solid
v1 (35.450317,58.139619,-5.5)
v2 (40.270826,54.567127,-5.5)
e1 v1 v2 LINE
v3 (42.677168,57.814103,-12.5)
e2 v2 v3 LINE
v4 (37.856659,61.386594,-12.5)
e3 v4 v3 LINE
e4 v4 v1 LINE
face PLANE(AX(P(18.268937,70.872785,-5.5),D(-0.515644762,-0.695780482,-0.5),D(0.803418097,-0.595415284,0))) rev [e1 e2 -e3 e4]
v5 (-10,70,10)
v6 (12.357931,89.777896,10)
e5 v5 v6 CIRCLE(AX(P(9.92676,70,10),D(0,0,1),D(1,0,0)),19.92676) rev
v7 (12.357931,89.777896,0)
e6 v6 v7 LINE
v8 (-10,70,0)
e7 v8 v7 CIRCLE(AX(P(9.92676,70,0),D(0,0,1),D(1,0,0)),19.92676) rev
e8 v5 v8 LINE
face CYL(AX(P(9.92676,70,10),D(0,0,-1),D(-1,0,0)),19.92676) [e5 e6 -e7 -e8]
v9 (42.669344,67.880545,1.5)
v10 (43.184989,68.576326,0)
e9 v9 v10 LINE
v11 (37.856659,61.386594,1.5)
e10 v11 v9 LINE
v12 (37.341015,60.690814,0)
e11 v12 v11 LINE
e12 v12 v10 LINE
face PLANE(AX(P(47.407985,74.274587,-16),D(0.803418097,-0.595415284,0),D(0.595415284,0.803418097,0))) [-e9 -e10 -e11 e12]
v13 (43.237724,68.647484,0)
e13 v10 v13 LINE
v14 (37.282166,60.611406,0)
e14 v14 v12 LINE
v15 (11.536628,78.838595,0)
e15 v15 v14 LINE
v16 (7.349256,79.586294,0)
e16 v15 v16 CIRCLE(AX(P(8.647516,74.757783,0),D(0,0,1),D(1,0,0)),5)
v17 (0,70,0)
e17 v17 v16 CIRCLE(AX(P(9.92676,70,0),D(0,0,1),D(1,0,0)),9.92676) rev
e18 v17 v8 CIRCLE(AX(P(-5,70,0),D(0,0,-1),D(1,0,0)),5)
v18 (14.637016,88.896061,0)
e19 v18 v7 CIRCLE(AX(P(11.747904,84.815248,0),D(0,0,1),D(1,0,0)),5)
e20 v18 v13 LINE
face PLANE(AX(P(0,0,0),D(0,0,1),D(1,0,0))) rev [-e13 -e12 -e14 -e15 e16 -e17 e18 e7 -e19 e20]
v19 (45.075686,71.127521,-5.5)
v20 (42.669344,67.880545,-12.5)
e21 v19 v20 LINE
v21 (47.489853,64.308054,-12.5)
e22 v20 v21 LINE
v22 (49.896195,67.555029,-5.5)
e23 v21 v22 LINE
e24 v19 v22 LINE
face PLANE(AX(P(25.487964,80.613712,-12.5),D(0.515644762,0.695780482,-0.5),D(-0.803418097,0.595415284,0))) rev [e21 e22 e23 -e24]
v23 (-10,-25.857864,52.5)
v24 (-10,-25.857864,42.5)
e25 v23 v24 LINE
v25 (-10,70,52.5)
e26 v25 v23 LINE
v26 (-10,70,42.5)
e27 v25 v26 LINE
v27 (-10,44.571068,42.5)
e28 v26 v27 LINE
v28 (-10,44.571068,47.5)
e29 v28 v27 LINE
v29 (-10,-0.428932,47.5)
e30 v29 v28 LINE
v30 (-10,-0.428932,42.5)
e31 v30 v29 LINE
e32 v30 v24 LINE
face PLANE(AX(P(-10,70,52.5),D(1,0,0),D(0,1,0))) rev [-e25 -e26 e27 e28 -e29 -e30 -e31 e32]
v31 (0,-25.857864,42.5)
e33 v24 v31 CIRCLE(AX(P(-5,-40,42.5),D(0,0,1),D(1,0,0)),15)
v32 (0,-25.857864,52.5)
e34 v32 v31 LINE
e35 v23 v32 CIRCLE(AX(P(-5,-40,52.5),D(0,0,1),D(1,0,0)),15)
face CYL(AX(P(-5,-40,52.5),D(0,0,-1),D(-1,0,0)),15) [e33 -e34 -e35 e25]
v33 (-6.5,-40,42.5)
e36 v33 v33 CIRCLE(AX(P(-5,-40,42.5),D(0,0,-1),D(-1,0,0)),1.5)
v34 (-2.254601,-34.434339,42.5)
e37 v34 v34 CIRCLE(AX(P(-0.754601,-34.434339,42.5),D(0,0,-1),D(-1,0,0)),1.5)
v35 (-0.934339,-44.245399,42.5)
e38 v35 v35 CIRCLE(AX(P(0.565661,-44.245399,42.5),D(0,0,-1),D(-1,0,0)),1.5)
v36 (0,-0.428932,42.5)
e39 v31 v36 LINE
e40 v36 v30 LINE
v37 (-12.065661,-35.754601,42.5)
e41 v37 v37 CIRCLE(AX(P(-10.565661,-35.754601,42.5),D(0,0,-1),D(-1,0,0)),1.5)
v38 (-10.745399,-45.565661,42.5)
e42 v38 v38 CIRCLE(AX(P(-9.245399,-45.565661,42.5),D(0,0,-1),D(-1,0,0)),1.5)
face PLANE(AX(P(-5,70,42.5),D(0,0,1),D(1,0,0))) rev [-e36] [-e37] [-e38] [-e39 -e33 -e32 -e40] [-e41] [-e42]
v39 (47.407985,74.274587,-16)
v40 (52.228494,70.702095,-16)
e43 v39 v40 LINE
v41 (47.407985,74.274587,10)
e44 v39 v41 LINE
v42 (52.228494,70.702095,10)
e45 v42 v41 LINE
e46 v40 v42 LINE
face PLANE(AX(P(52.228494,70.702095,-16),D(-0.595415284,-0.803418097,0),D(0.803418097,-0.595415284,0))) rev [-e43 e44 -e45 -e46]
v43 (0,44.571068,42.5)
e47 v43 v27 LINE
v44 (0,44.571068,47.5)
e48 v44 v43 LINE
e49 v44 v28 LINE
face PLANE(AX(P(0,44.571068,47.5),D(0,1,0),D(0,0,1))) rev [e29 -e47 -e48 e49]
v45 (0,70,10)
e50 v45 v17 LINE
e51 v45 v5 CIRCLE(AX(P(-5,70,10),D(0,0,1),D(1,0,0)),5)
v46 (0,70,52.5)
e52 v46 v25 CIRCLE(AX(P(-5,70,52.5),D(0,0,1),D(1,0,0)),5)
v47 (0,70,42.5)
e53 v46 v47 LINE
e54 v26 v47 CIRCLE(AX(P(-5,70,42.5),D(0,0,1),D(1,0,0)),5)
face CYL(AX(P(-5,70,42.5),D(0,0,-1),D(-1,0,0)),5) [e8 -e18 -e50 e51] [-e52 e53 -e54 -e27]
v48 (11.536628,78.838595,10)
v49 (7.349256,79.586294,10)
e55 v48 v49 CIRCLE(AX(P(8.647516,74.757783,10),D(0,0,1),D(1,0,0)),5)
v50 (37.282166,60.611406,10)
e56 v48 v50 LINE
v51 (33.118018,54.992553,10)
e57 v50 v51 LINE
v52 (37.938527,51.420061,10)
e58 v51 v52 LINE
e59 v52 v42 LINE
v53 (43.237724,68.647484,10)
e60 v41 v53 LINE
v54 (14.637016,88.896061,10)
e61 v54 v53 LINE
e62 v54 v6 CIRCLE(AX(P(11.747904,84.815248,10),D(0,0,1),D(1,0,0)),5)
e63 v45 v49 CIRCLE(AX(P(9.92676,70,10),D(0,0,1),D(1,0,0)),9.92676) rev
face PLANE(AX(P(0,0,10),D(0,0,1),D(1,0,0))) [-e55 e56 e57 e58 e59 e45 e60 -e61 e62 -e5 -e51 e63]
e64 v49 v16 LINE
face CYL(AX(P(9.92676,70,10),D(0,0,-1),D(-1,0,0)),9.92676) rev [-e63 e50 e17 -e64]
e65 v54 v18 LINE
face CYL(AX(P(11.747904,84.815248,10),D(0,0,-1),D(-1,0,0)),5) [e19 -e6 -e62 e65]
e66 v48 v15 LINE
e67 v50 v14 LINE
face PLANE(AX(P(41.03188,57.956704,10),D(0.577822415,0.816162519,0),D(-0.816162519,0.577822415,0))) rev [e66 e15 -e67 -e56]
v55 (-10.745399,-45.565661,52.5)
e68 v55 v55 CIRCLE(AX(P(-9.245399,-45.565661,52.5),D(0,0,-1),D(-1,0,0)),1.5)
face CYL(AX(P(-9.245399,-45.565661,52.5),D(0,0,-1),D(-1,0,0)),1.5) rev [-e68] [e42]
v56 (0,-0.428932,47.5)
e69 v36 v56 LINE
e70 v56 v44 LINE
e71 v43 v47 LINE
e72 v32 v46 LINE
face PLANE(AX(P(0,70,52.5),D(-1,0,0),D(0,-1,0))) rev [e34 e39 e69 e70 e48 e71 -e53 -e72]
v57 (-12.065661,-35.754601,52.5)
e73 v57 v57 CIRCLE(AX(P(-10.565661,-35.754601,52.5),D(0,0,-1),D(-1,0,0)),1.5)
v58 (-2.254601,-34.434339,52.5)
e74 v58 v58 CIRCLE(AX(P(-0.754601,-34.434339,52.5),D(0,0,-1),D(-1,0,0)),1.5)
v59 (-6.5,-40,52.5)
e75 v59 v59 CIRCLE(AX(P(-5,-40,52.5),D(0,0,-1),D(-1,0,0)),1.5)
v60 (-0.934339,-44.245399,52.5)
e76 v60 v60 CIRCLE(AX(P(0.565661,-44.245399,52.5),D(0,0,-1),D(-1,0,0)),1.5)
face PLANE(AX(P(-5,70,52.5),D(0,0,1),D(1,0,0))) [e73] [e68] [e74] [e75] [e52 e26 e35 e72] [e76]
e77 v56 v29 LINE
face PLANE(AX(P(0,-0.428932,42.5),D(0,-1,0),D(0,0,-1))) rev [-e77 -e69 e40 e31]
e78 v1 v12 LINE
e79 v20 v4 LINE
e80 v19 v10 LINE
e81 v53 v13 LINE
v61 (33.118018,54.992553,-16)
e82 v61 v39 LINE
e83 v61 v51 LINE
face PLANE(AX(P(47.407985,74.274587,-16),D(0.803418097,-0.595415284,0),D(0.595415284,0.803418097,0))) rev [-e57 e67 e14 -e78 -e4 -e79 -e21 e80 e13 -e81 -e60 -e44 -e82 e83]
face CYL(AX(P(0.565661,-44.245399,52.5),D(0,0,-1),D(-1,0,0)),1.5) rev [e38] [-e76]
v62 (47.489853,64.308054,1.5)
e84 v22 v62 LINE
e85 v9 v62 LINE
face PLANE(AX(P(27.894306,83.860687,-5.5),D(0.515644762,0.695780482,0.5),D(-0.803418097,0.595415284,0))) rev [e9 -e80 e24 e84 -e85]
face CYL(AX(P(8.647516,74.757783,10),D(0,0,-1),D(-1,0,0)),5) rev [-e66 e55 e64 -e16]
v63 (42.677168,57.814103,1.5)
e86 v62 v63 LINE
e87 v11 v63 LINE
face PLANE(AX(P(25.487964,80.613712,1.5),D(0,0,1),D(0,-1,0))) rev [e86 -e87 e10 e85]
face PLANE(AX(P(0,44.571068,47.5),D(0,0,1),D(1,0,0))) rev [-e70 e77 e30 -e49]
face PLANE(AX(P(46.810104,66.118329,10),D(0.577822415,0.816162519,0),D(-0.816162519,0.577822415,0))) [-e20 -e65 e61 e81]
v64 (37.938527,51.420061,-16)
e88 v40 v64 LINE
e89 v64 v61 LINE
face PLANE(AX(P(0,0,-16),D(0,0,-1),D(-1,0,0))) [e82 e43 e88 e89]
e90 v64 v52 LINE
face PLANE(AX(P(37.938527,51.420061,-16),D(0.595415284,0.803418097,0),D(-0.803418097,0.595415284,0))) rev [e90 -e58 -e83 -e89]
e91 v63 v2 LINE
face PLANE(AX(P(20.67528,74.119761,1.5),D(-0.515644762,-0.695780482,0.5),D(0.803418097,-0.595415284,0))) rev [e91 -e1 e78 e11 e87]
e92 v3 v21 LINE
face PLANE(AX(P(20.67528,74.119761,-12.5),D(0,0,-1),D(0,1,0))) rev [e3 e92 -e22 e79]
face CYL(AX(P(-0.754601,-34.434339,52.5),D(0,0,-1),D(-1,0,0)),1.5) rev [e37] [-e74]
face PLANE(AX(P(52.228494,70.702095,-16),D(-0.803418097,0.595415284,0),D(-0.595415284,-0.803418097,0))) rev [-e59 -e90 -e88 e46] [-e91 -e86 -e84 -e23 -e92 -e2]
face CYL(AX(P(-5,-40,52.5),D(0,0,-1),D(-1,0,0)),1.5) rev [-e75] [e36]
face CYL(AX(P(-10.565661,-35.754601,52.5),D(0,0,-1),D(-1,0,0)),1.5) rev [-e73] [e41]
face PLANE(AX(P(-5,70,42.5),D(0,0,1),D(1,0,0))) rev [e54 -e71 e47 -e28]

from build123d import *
from build123d.topology import SkipClean

# Parameters (mm, degrees)
BOSS_EXTRUDE1_DEPTH  = 10
SKETCH6_R            = 5
BOSS_EXTRUDE4_DEPTH  = 32.5
SKETCH10_W           = 10
SKETCH10_H           = 45
CUT_EXTRUDE5_DEPTH   = 10
CUT_EXTRUDE10_START  = -10
CUT_EXTRUDE10_DEPTH  = 10
BOSS_EXTRUDE8_DEPTH  = 10
SKETCH19_R           = 1.5
CUT_EXTRUDE11_DEPTH  = 110.357366333
BOSS_EXTRUDE9_DEPTH  = 16
BOSS_EXTRUDE10_DEPTH = 10
CUT_EXTRUDE12_DEPTH  = 6
SKETCH24_W           = 5
SKETCH24_H           = 45
CUT_EXTRUDE14_DEPTH  = 10


with BuildPart() as part:
    # Sketch1 → Boss-Extrude1 (new body)
    with BuildSketch(Plane.XY):
        with BuildLine():
            Line((-10, 0), (0, 0))
            Line((0, 0), (0, 70))
            ThreePointArc((0, 70), (2.048726408, 76.039631539), (7.349256082, 79.586293943))
            ThreePointArc((7.349256082, 79.586293943), (9.526416607, 79.679930085), (11.536628421, 78.838595348))
            Line((11.536628421, 78.838595348), (37.563736921, 60.412060989))
            ThreePointArc((37.563736921, 60.412060989), (44.533661589, 61.603761507), (43.341961071, 68.573686175))
            Line((43.341961071, 68.573686175), (14.637016156, 88.896060969))
            ThreePointArc((14.637016156, 88.896060969), (13.552177116, 89.478358799), (12.35793082, 89.777895591))
            ThreePointArc((12.35793082, 89.777895591), (11.217987252, 89.884880656), (10.073780788, 89.926217211))
            ThreePointArc((10.073780788, 89.926217211), (4.526251311, 89.180986887), (-0.595162082, 86.922319935))
            ThreePointArc((-0.595162082, 86.922319935), (-4.504675426, 83.740794413), (-7.490811299, 79.680081201))
            ThreePointArc((-7.490811299, 79.680081201), (-9.362505501, 75), (-10, 70))
            Line((-10, 70), (-10, 0))
        make_face()
    extrude(amount=BOSS_EXTRUDE1_DEPTH)

    # Sketch6 → Boss-Extrude4 (add)
    with BuildSketch(Plane.XY.offset(10)):
        with Locations((-5, 70)):
            Circle(SKETCH6_R)
    extrude(amount=BOSS_EXTRUDE4_DEPTH)

    # Sketch10 → Cut-Extrude5 (cut)
    with BuildSketch(Plane(origin=(0, 0, 0), x_dir=(-1, 0, 0), z_dir=(0, 0, -1))):
        with Locations((5, 22.5)):
            Rectangle(SKETCH10_W, SKETCH10_H)
    extrude(amount=-CUT_EXTRUDE5_DEPTH, mode=Mode.SUBTRACT)

    # Sketch17 → Cut-Extrude10 (cut)
    with BuildSketch(Plane.XY.offset(10).offset(CUT_EXTRUDE10_START)):
        with BuildLine():
            Line((-10, 45), (0, 45))
            Line((0, 45), (0, 70))
            ThreePointArc((0, 70), (-5, 65), (-10, 70))
            Line((-10, 70), (-10, 45))
        make_face()
    extrude(amount=CUT_EXTRUDE10_DEPTH, mode=Mode.SUBTRACT)

    # Sketch18 → Boss-Extrude8 (add)
    with SkipClean():  # the faces are left unmerged after this step: merging them gives an invalid solid
        with BuildSketch(Plane.XY.offset(42.5)):
            with BuildLine():
                Line((0, 70), (0, -25.857864376))
                ThreePointArc((0, -25.857864376), (-5, -55), (-10, -25.857864376))
                Line((-10, -25.857864376), (-10, 70))
                ThreePointArc((-10, 70), (-5, 75), (0, 70))
            make_face()
        extrude(amount=BOSS_EXTRUDE8_DEPTH)
    add(part.part.scale(1), mode=Mode.REPLACE)  # the faces are merged on a copy

    # Sketch19 → Cut-Extrude11 (cut, through all)
    with BuildSketch(Plane(origin=(0, 0, 42.5), x_dir=(-1, 0, 0), z_dir=(0, 0, -1))):
        with Locations((5, -40)):
            Circle(SKETCH19_R)
        with Locations((10.565661313, -35.754600825)):
            Circle(SKETCH19_R)
        with Locations((0.754600825, -34.434338687)):
            Circle(SKETCH19_R)
        with Locations((-0.565661313, -44.245399175)):
            Circle(SKETCH19_R)
        with Locations((9.245399175, -45.565661313)):
            Circle(SKETCH19_R)
    extrude(amount=-CUT_EXTRUDE11_DEPTH, mode=Mode.SUBTRACT)

    # Sketch20 → Boss-Extrude9 (add)
    with BuildSketch(Plane(origin=(0, 0, 0), x_dir=(-1, 0, 0), z_dir=(0, 0, -1))):
        Polygon((-52.228493699, 70.702095376), (-47.407985115, 74.274587083), (-33.118018288, 54.992552749), (-37.938526871, 51.420061042), align=None)
    extrude(amount=BOSS_EXTRUDE9_DEPTH)

    # Sketch21 → Boss-Extrude10 (add)
    with BuildSketch(Plane.XY):
        with BuildLine():
            Line((43.237723755, 68.647483557), (43.341961071, 68.573686175))
            ThreePointArc((43.341961071, 68.573686175), (44.533661589, 61.603761507), (37.563736921, 60.412060989))
            Line((37.563736921, 60.412060989), (37.282165609, 60.611406354))
            Line((37.282165609, 60.611406354), (33.118018288, 54.992552749))
            Line((33.118018288, 54.992552749), (37.938526871, 51.420061042))
            Line((37.938526871, 51.420061042), (52.228493699, 70.702095376))
            Line((52.228493699, 70.702095376), (47.407985115, 74.274587083))
            Line((47.407985115, 74.274587083), (43.237723755, 68.647483557))
        make_face()
    extrude(amount=BOSS_EXTRUDE10_DEPTH)

    # Sketch22 → Cut-Extrude12 (cut)
    with BuildSketch(Plane(origin=(-0.109097108, 0.080852156, 0), x_dir=(0, 0, -1), z_dir=(0.8034180972667123, -0.5954152844732287, 0))):
        Polygon((12.5, 71.859534489), (12.5, 79.942438258), (5.5, 83.983890142), (-1.5, 79.942438258), (-1.5, 71.859534489), (5.5, 67.818082605), align=None)
    extrude(amount=-CUT_EXTRUDE12_DEPTH, mode=Mode.SUBTRACT)

    # Sketch24 → Cut-Extrude14 (cut)
    with BuildSketch(Plane.ZY.offset(10)):
        with Locations((45, 22.071067812)):
            Rectangle(SKETCH24_W, SKETCH24_H)
    extrude(amount=-CUT_EXTRUDE14_DEPTH, mode=Mode.SUBTRACT)


solid = part.part
